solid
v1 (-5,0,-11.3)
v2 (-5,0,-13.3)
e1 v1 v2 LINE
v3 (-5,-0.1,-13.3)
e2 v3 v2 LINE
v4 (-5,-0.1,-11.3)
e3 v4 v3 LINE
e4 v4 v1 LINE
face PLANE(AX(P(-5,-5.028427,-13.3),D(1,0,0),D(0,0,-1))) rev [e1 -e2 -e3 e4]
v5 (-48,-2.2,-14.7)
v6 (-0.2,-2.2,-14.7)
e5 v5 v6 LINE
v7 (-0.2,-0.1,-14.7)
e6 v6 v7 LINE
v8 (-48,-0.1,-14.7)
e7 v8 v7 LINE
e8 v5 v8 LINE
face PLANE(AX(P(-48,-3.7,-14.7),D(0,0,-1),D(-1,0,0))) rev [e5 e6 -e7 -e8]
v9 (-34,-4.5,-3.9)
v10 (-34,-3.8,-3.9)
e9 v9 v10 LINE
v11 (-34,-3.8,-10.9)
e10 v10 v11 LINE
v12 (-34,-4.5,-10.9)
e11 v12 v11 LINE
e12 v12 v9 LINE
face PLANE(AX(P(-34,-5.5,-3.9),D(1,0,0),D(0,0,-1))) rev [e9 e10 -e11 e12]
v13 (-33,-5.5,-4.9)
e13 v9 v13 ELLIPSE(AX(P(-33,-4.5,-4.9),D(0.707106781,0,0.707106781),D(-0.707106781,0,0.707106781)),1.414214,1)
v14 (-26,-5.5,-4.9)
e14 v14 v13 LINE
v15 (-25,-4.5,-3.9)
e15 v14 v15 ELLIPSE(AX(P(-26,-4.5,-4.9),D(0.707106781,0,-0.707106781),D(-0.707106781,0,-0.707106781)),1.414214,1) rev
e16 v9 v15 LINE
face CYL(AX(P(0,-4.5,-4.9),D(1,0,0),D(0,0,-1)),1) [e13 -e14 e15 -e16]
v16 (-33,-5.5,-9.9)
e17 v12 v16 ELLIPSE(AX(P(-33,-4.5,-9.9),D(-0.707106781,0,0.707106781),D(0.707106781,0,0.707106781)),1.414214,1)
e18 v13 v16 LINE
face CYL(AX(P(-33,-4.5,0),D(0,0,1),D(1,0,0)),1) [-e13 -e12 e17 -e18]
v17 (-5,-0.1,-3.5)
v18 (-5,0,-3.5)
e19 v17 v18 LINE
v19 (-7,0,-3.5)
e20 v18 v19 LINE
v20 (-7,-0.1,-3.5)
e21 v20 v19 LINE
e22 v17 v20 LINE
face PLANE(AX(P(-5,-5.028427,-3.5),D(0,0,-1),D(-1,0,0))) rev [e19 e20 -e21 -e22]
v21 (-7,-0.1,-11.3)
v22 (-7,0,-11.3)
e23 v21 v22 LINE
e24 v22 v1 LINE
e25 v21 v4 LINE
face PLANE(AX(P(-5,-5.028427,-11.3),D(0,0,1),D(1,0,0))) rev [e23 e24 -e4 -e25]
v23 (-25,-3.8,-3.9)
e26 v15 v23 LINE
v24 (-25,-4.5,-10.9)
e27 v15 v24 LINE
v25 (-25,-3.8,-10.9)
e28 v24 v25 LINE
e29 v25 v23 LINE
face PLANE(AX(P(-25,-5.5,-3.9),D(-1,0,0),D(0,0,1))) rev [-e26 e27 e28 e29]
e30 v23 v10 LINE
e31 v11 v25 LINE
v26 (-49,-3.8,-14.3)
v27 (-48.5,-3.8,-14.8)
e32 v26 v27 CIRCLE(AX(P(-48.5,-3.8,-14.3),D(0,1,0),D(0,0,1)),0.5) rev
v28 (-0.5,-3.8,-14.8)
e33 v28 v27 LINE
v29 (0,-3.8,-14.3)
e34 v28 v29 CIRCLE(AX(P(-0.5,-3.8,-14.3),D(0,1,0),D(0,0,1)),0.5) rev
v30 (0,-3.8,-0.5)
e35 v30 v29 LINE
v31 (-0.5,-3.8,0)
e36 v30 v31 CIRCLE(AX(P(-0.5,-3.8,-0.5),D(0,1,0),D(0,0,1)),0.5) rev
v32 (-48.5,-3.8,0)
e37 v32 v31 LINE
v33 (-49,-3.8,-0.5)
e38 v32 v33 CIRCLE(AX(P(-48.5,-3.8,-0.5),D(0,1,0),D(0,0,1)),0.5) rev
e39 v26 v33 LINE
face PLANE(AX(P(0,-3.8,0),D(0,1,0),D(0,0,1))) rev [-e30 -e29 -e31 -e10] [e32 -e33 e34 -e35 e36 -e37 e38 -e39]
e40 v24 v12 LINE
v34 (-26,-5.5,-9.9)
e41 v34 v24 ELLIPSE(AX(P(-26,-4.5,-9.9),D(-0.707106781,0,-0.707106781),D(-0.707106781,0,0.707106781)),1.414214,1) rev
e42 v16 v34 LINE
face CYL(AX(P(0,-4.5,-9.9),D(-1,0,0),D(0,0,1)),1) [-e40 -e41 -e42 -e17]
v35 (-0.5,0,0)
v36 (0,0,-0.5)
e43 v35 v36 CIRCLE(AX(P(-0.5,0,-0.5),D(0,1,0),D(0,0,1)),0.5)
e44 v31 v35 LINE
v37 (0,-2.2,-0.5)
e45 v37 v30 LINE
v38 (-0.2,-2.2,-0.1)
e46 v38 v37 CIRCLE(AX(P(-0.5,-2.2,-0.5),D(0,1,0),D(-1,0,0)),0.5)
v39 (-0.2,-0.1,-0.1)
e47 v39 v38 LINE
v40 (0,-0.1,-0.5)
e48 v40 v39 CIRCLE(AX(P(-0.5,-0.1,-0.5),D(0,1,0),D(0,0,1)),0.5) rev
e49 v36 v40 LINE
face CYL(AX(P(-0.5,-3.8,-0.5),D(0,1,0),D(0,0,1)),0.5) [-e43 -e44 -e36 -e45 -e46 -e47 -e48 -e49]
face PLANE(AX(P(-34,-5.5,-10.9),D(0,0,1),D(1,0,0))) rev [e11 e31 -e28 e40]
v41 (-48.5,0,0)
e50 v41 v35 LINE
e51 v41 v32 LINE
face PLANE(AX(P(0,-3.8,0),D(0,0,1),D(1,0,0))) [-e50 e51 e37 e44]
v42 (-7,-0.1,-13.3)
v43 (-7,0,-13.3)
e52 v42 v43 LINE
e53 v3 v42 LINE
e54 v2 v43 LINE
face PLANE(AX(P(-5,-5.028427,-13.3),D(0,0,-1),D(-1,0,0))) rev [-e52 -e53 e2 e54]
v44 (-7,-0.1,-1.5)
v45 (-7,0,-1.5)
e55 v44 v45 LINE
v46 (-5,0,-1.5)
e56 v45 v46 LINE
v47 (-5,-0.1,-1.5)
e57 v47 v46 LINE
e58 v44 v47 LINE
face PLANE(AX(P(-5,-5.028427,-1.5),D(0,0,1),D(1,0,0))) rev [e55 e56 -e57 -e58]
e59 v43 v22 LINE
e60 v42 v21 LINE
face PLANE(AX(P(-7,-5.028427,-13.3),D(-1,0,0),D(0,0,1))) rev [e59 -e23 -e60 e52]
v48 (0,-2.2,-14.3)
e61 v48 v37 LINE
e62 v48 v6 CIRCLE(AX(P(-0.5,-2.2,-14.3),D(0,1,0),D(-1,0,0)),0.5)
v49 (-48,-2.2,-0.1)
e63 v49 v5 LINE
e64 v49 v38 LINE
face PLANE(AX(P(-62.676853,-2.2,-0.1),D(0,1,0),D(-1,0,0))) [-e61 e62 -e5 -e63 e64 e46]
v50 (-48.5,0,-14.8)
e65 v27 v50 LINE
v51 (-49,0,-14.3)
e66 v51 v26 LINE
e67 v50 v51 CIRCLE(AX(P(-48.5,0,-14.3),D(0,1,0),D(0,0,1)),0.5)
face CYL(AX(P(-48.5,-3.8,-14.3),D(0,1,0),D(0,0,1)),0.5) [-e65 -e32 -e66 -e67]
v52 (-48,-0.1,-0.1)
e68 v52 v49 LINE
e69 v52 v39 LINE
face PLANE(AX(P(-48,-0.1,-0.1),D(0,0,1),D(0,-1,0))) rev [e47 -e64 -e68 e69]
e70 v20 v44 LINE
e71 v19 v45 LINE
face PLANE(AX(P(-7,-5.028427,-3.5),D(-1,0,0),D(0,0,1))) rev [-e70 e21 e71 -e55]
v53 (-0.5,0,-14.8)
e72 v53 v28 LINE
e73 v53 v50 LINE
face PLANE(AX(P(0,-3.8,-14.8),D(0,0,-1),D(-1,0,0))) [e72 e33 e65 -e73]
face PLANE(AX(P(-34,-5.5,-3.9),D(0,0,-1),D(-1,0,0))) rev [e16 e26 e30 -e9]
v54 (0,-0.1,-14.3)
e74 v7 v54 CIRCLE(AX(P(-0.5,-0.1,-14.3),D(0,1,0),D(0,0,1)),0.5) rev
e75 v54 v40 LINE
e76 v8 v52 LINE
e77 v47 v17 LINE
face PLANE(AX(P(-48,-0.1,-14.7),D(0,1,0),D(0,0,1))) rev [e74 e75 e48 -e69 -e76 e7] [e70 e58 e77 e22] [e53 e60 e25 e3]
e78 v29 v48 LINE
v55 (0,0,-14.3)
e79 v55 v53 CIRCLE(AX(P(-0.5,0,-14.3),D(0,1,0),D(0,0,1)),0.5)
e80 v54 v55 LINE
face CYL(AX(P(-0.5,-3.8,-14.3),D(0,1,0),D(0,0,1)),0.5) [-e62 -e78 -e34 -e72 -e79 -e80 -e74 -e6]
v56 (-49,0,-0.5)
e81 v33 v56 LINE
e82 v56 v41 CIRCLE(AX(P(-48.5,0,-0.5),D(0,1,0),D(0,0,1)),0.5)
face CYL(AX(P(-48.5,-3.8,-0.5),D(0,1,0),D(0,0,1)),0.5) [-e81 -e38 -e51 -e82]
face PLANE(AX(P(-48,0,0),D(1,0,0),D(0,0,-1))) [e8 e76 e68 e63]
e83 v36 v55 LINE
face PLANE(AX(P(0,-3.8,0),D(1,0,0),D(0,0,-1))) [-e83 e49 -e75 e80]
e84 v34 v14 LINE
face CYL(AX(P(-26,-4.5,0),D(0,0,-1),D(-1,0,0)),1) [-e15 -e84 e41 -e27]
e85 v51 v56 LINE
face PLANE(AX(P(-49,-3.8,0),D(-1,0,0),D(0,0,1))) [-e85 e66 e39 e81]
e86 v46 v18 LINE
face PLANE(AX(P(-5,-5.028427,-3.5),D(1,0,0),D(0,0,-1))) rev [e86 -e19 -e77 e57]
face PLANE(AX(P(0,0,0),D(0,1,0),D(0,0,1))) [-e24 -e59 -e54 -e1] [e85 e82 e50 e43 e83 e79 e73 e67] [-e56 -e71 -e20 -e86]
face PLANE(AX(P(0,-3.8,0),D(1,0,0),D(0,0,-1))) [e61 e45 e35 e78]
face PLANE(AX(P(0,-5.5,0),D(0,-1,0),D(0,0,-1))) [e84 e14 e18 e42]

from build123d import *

# Parameters (mm, degrees)
SKETCH1_W           = 49
SKETCH1_H           = 14.8
BOSS_EXTRUDE1_DEPTH = 3.8
SKETCH2_W           = 14.6
SKETCH2_H           = 3.6
CUT_EXTRUDE1_DEPTH  = 48
SKETCH3_W           = 14.6
SKETCH3_H           = 1.5
BOSS_EXTRUDE2_DEPTH = 48
SKETCH5_W           = 2
SKETCH5_H           = 2
CUT_EXTRUDE2_DEPTH  = 2.2
FILLET1_R           = 0.5
SKETCH6_W           = 9
SKETCH6_H           = 7
BOSS_EXTRUDE3_DEPTH = 1.7
FILLET2_R           = 1


with BuildPart() as part:
    # Sketch1 → Boss-Extrude1 (new body)
    with BuildSketch(Plane(origin=(0, 0, 0), x_dir=(1, 0, 0), z_dir=(0, 1, 0))):
        with Locations((-24.5, 7.4)):
            Rectangle(SKETCH1_W, SKETCH1_H)
    extrude(amount=-BOSS_EXTRUDE1_DEPTH)

    # Sketch2 → Cut-Extrude1 (cut)
    with BuildSketch(Plane(origin=(0, 0, 0), x_dir=(0, 0, -1), z_dir=(1, 0, 0))):
        with Locations((7.4, -1.9)):
            Rectangle(SKETCH2_W, SKETCH2_H)
    extrude(amount=-CUT_EXTRUDE1_DEPTH, mode=Mode.SUBTRACT)

    # Sketch3 → Boss-Extrude2 (add)
    with BuildSketch(Plane(origin=(0, 0, 0), x_dir=(0, 0, -1), z_dir=(1, 0, 0))):
        with Locations((7.4, -2.95)):
            Rectangle(SKETCH3_W, SKETCH3_H)
    extrude(amount=-BOSS_EXTRUDE2_DEPTH)

    # Sketch5 → Cut-Extrude2 (cut)
    with BuildSketch(Plane(origin=(0, 0, 0), x_dir=(1, 0, 0), z_dir=(0, 1, 0))):
        with Locations((-6, 12.3)):
            Rectangle(SKETCH5_W, SKETCH5_H)
        with Locations((-6, 2.5)):
            Rectangle(SKETCH5_W, SKETCH5_H)
    extrude(amount=-CUT_EXTRUDE2_DEPTH, mode=Mode.SUBTRACT)

    # Fillet1
    # the kernel refuses this fillet: 0.5 mm, written as the material it takes off along each edge
    with BuildSketch(Plane(origin=(0, 1.25, 0), x_dir=(-1, 0, 0), z_dir=(0, -1, 0)), Plane(origin=(0, 1.25, -14.8), x_dir=(0, 0, 1), z_dir=(0, -1, 0))) as fillet1_piece_1:
        with BuildLine():
            CenterArc((FILLET1_R, FILLET1_R), FILLET1_R, 180, 90)
            Line((0, FILLET1_R), (0, 0))
            Line((0, 0), (FILLET1_R, 0))
        make_face()
    extrude(amount=6.3, mode=Mode.SUBTRACT)
    with BuildSketch(Plane(origin=(-49, 1.25, -14.8), x_dir=(0, 0, 1), z_dir=(0, -1, 0)), Plane(origin=(-49, 1.25, 0), x_dir=(1, 0, 0), z_dir=(0, -1, 0))) as fillet1_piece_2:
        with BuildLine():
            CenterArc((FILLET1_R, -FILLET1_R), FILLET1_R, 90, 90)
            Line((0, -FILLET1_R), (0, 0))
            Line((0, 0), (FILLET1_R, 0))
        make_face()
    extrude(amount=6.3, mode=Mode.SUBTRACT)

    # Sketch6 → Boss-Extrude3 (add)
    with BuildSketch(Plane.XZ.offset(3.8)):
        with Locations((-29.5, -7.4)):
            Rectangle(SKETCH6_W, SKETCH6_H)
    extrude(amount=BOSS_EXTRUDE3_DEPTH)

    # Fillet2
    fillet2_edges = [part.edges().sort_by_distance(p)[0] for p in [
        (-34, -5.5, -7.4),
        (-29.5, -5.5, -10.9),
        (-25, -5.5, -7.4),
        (-29.5, -5.5, -3.9),
    ]]
    fillet(fillet2_edges, radius=FILLET2_R)


solid = part.part
